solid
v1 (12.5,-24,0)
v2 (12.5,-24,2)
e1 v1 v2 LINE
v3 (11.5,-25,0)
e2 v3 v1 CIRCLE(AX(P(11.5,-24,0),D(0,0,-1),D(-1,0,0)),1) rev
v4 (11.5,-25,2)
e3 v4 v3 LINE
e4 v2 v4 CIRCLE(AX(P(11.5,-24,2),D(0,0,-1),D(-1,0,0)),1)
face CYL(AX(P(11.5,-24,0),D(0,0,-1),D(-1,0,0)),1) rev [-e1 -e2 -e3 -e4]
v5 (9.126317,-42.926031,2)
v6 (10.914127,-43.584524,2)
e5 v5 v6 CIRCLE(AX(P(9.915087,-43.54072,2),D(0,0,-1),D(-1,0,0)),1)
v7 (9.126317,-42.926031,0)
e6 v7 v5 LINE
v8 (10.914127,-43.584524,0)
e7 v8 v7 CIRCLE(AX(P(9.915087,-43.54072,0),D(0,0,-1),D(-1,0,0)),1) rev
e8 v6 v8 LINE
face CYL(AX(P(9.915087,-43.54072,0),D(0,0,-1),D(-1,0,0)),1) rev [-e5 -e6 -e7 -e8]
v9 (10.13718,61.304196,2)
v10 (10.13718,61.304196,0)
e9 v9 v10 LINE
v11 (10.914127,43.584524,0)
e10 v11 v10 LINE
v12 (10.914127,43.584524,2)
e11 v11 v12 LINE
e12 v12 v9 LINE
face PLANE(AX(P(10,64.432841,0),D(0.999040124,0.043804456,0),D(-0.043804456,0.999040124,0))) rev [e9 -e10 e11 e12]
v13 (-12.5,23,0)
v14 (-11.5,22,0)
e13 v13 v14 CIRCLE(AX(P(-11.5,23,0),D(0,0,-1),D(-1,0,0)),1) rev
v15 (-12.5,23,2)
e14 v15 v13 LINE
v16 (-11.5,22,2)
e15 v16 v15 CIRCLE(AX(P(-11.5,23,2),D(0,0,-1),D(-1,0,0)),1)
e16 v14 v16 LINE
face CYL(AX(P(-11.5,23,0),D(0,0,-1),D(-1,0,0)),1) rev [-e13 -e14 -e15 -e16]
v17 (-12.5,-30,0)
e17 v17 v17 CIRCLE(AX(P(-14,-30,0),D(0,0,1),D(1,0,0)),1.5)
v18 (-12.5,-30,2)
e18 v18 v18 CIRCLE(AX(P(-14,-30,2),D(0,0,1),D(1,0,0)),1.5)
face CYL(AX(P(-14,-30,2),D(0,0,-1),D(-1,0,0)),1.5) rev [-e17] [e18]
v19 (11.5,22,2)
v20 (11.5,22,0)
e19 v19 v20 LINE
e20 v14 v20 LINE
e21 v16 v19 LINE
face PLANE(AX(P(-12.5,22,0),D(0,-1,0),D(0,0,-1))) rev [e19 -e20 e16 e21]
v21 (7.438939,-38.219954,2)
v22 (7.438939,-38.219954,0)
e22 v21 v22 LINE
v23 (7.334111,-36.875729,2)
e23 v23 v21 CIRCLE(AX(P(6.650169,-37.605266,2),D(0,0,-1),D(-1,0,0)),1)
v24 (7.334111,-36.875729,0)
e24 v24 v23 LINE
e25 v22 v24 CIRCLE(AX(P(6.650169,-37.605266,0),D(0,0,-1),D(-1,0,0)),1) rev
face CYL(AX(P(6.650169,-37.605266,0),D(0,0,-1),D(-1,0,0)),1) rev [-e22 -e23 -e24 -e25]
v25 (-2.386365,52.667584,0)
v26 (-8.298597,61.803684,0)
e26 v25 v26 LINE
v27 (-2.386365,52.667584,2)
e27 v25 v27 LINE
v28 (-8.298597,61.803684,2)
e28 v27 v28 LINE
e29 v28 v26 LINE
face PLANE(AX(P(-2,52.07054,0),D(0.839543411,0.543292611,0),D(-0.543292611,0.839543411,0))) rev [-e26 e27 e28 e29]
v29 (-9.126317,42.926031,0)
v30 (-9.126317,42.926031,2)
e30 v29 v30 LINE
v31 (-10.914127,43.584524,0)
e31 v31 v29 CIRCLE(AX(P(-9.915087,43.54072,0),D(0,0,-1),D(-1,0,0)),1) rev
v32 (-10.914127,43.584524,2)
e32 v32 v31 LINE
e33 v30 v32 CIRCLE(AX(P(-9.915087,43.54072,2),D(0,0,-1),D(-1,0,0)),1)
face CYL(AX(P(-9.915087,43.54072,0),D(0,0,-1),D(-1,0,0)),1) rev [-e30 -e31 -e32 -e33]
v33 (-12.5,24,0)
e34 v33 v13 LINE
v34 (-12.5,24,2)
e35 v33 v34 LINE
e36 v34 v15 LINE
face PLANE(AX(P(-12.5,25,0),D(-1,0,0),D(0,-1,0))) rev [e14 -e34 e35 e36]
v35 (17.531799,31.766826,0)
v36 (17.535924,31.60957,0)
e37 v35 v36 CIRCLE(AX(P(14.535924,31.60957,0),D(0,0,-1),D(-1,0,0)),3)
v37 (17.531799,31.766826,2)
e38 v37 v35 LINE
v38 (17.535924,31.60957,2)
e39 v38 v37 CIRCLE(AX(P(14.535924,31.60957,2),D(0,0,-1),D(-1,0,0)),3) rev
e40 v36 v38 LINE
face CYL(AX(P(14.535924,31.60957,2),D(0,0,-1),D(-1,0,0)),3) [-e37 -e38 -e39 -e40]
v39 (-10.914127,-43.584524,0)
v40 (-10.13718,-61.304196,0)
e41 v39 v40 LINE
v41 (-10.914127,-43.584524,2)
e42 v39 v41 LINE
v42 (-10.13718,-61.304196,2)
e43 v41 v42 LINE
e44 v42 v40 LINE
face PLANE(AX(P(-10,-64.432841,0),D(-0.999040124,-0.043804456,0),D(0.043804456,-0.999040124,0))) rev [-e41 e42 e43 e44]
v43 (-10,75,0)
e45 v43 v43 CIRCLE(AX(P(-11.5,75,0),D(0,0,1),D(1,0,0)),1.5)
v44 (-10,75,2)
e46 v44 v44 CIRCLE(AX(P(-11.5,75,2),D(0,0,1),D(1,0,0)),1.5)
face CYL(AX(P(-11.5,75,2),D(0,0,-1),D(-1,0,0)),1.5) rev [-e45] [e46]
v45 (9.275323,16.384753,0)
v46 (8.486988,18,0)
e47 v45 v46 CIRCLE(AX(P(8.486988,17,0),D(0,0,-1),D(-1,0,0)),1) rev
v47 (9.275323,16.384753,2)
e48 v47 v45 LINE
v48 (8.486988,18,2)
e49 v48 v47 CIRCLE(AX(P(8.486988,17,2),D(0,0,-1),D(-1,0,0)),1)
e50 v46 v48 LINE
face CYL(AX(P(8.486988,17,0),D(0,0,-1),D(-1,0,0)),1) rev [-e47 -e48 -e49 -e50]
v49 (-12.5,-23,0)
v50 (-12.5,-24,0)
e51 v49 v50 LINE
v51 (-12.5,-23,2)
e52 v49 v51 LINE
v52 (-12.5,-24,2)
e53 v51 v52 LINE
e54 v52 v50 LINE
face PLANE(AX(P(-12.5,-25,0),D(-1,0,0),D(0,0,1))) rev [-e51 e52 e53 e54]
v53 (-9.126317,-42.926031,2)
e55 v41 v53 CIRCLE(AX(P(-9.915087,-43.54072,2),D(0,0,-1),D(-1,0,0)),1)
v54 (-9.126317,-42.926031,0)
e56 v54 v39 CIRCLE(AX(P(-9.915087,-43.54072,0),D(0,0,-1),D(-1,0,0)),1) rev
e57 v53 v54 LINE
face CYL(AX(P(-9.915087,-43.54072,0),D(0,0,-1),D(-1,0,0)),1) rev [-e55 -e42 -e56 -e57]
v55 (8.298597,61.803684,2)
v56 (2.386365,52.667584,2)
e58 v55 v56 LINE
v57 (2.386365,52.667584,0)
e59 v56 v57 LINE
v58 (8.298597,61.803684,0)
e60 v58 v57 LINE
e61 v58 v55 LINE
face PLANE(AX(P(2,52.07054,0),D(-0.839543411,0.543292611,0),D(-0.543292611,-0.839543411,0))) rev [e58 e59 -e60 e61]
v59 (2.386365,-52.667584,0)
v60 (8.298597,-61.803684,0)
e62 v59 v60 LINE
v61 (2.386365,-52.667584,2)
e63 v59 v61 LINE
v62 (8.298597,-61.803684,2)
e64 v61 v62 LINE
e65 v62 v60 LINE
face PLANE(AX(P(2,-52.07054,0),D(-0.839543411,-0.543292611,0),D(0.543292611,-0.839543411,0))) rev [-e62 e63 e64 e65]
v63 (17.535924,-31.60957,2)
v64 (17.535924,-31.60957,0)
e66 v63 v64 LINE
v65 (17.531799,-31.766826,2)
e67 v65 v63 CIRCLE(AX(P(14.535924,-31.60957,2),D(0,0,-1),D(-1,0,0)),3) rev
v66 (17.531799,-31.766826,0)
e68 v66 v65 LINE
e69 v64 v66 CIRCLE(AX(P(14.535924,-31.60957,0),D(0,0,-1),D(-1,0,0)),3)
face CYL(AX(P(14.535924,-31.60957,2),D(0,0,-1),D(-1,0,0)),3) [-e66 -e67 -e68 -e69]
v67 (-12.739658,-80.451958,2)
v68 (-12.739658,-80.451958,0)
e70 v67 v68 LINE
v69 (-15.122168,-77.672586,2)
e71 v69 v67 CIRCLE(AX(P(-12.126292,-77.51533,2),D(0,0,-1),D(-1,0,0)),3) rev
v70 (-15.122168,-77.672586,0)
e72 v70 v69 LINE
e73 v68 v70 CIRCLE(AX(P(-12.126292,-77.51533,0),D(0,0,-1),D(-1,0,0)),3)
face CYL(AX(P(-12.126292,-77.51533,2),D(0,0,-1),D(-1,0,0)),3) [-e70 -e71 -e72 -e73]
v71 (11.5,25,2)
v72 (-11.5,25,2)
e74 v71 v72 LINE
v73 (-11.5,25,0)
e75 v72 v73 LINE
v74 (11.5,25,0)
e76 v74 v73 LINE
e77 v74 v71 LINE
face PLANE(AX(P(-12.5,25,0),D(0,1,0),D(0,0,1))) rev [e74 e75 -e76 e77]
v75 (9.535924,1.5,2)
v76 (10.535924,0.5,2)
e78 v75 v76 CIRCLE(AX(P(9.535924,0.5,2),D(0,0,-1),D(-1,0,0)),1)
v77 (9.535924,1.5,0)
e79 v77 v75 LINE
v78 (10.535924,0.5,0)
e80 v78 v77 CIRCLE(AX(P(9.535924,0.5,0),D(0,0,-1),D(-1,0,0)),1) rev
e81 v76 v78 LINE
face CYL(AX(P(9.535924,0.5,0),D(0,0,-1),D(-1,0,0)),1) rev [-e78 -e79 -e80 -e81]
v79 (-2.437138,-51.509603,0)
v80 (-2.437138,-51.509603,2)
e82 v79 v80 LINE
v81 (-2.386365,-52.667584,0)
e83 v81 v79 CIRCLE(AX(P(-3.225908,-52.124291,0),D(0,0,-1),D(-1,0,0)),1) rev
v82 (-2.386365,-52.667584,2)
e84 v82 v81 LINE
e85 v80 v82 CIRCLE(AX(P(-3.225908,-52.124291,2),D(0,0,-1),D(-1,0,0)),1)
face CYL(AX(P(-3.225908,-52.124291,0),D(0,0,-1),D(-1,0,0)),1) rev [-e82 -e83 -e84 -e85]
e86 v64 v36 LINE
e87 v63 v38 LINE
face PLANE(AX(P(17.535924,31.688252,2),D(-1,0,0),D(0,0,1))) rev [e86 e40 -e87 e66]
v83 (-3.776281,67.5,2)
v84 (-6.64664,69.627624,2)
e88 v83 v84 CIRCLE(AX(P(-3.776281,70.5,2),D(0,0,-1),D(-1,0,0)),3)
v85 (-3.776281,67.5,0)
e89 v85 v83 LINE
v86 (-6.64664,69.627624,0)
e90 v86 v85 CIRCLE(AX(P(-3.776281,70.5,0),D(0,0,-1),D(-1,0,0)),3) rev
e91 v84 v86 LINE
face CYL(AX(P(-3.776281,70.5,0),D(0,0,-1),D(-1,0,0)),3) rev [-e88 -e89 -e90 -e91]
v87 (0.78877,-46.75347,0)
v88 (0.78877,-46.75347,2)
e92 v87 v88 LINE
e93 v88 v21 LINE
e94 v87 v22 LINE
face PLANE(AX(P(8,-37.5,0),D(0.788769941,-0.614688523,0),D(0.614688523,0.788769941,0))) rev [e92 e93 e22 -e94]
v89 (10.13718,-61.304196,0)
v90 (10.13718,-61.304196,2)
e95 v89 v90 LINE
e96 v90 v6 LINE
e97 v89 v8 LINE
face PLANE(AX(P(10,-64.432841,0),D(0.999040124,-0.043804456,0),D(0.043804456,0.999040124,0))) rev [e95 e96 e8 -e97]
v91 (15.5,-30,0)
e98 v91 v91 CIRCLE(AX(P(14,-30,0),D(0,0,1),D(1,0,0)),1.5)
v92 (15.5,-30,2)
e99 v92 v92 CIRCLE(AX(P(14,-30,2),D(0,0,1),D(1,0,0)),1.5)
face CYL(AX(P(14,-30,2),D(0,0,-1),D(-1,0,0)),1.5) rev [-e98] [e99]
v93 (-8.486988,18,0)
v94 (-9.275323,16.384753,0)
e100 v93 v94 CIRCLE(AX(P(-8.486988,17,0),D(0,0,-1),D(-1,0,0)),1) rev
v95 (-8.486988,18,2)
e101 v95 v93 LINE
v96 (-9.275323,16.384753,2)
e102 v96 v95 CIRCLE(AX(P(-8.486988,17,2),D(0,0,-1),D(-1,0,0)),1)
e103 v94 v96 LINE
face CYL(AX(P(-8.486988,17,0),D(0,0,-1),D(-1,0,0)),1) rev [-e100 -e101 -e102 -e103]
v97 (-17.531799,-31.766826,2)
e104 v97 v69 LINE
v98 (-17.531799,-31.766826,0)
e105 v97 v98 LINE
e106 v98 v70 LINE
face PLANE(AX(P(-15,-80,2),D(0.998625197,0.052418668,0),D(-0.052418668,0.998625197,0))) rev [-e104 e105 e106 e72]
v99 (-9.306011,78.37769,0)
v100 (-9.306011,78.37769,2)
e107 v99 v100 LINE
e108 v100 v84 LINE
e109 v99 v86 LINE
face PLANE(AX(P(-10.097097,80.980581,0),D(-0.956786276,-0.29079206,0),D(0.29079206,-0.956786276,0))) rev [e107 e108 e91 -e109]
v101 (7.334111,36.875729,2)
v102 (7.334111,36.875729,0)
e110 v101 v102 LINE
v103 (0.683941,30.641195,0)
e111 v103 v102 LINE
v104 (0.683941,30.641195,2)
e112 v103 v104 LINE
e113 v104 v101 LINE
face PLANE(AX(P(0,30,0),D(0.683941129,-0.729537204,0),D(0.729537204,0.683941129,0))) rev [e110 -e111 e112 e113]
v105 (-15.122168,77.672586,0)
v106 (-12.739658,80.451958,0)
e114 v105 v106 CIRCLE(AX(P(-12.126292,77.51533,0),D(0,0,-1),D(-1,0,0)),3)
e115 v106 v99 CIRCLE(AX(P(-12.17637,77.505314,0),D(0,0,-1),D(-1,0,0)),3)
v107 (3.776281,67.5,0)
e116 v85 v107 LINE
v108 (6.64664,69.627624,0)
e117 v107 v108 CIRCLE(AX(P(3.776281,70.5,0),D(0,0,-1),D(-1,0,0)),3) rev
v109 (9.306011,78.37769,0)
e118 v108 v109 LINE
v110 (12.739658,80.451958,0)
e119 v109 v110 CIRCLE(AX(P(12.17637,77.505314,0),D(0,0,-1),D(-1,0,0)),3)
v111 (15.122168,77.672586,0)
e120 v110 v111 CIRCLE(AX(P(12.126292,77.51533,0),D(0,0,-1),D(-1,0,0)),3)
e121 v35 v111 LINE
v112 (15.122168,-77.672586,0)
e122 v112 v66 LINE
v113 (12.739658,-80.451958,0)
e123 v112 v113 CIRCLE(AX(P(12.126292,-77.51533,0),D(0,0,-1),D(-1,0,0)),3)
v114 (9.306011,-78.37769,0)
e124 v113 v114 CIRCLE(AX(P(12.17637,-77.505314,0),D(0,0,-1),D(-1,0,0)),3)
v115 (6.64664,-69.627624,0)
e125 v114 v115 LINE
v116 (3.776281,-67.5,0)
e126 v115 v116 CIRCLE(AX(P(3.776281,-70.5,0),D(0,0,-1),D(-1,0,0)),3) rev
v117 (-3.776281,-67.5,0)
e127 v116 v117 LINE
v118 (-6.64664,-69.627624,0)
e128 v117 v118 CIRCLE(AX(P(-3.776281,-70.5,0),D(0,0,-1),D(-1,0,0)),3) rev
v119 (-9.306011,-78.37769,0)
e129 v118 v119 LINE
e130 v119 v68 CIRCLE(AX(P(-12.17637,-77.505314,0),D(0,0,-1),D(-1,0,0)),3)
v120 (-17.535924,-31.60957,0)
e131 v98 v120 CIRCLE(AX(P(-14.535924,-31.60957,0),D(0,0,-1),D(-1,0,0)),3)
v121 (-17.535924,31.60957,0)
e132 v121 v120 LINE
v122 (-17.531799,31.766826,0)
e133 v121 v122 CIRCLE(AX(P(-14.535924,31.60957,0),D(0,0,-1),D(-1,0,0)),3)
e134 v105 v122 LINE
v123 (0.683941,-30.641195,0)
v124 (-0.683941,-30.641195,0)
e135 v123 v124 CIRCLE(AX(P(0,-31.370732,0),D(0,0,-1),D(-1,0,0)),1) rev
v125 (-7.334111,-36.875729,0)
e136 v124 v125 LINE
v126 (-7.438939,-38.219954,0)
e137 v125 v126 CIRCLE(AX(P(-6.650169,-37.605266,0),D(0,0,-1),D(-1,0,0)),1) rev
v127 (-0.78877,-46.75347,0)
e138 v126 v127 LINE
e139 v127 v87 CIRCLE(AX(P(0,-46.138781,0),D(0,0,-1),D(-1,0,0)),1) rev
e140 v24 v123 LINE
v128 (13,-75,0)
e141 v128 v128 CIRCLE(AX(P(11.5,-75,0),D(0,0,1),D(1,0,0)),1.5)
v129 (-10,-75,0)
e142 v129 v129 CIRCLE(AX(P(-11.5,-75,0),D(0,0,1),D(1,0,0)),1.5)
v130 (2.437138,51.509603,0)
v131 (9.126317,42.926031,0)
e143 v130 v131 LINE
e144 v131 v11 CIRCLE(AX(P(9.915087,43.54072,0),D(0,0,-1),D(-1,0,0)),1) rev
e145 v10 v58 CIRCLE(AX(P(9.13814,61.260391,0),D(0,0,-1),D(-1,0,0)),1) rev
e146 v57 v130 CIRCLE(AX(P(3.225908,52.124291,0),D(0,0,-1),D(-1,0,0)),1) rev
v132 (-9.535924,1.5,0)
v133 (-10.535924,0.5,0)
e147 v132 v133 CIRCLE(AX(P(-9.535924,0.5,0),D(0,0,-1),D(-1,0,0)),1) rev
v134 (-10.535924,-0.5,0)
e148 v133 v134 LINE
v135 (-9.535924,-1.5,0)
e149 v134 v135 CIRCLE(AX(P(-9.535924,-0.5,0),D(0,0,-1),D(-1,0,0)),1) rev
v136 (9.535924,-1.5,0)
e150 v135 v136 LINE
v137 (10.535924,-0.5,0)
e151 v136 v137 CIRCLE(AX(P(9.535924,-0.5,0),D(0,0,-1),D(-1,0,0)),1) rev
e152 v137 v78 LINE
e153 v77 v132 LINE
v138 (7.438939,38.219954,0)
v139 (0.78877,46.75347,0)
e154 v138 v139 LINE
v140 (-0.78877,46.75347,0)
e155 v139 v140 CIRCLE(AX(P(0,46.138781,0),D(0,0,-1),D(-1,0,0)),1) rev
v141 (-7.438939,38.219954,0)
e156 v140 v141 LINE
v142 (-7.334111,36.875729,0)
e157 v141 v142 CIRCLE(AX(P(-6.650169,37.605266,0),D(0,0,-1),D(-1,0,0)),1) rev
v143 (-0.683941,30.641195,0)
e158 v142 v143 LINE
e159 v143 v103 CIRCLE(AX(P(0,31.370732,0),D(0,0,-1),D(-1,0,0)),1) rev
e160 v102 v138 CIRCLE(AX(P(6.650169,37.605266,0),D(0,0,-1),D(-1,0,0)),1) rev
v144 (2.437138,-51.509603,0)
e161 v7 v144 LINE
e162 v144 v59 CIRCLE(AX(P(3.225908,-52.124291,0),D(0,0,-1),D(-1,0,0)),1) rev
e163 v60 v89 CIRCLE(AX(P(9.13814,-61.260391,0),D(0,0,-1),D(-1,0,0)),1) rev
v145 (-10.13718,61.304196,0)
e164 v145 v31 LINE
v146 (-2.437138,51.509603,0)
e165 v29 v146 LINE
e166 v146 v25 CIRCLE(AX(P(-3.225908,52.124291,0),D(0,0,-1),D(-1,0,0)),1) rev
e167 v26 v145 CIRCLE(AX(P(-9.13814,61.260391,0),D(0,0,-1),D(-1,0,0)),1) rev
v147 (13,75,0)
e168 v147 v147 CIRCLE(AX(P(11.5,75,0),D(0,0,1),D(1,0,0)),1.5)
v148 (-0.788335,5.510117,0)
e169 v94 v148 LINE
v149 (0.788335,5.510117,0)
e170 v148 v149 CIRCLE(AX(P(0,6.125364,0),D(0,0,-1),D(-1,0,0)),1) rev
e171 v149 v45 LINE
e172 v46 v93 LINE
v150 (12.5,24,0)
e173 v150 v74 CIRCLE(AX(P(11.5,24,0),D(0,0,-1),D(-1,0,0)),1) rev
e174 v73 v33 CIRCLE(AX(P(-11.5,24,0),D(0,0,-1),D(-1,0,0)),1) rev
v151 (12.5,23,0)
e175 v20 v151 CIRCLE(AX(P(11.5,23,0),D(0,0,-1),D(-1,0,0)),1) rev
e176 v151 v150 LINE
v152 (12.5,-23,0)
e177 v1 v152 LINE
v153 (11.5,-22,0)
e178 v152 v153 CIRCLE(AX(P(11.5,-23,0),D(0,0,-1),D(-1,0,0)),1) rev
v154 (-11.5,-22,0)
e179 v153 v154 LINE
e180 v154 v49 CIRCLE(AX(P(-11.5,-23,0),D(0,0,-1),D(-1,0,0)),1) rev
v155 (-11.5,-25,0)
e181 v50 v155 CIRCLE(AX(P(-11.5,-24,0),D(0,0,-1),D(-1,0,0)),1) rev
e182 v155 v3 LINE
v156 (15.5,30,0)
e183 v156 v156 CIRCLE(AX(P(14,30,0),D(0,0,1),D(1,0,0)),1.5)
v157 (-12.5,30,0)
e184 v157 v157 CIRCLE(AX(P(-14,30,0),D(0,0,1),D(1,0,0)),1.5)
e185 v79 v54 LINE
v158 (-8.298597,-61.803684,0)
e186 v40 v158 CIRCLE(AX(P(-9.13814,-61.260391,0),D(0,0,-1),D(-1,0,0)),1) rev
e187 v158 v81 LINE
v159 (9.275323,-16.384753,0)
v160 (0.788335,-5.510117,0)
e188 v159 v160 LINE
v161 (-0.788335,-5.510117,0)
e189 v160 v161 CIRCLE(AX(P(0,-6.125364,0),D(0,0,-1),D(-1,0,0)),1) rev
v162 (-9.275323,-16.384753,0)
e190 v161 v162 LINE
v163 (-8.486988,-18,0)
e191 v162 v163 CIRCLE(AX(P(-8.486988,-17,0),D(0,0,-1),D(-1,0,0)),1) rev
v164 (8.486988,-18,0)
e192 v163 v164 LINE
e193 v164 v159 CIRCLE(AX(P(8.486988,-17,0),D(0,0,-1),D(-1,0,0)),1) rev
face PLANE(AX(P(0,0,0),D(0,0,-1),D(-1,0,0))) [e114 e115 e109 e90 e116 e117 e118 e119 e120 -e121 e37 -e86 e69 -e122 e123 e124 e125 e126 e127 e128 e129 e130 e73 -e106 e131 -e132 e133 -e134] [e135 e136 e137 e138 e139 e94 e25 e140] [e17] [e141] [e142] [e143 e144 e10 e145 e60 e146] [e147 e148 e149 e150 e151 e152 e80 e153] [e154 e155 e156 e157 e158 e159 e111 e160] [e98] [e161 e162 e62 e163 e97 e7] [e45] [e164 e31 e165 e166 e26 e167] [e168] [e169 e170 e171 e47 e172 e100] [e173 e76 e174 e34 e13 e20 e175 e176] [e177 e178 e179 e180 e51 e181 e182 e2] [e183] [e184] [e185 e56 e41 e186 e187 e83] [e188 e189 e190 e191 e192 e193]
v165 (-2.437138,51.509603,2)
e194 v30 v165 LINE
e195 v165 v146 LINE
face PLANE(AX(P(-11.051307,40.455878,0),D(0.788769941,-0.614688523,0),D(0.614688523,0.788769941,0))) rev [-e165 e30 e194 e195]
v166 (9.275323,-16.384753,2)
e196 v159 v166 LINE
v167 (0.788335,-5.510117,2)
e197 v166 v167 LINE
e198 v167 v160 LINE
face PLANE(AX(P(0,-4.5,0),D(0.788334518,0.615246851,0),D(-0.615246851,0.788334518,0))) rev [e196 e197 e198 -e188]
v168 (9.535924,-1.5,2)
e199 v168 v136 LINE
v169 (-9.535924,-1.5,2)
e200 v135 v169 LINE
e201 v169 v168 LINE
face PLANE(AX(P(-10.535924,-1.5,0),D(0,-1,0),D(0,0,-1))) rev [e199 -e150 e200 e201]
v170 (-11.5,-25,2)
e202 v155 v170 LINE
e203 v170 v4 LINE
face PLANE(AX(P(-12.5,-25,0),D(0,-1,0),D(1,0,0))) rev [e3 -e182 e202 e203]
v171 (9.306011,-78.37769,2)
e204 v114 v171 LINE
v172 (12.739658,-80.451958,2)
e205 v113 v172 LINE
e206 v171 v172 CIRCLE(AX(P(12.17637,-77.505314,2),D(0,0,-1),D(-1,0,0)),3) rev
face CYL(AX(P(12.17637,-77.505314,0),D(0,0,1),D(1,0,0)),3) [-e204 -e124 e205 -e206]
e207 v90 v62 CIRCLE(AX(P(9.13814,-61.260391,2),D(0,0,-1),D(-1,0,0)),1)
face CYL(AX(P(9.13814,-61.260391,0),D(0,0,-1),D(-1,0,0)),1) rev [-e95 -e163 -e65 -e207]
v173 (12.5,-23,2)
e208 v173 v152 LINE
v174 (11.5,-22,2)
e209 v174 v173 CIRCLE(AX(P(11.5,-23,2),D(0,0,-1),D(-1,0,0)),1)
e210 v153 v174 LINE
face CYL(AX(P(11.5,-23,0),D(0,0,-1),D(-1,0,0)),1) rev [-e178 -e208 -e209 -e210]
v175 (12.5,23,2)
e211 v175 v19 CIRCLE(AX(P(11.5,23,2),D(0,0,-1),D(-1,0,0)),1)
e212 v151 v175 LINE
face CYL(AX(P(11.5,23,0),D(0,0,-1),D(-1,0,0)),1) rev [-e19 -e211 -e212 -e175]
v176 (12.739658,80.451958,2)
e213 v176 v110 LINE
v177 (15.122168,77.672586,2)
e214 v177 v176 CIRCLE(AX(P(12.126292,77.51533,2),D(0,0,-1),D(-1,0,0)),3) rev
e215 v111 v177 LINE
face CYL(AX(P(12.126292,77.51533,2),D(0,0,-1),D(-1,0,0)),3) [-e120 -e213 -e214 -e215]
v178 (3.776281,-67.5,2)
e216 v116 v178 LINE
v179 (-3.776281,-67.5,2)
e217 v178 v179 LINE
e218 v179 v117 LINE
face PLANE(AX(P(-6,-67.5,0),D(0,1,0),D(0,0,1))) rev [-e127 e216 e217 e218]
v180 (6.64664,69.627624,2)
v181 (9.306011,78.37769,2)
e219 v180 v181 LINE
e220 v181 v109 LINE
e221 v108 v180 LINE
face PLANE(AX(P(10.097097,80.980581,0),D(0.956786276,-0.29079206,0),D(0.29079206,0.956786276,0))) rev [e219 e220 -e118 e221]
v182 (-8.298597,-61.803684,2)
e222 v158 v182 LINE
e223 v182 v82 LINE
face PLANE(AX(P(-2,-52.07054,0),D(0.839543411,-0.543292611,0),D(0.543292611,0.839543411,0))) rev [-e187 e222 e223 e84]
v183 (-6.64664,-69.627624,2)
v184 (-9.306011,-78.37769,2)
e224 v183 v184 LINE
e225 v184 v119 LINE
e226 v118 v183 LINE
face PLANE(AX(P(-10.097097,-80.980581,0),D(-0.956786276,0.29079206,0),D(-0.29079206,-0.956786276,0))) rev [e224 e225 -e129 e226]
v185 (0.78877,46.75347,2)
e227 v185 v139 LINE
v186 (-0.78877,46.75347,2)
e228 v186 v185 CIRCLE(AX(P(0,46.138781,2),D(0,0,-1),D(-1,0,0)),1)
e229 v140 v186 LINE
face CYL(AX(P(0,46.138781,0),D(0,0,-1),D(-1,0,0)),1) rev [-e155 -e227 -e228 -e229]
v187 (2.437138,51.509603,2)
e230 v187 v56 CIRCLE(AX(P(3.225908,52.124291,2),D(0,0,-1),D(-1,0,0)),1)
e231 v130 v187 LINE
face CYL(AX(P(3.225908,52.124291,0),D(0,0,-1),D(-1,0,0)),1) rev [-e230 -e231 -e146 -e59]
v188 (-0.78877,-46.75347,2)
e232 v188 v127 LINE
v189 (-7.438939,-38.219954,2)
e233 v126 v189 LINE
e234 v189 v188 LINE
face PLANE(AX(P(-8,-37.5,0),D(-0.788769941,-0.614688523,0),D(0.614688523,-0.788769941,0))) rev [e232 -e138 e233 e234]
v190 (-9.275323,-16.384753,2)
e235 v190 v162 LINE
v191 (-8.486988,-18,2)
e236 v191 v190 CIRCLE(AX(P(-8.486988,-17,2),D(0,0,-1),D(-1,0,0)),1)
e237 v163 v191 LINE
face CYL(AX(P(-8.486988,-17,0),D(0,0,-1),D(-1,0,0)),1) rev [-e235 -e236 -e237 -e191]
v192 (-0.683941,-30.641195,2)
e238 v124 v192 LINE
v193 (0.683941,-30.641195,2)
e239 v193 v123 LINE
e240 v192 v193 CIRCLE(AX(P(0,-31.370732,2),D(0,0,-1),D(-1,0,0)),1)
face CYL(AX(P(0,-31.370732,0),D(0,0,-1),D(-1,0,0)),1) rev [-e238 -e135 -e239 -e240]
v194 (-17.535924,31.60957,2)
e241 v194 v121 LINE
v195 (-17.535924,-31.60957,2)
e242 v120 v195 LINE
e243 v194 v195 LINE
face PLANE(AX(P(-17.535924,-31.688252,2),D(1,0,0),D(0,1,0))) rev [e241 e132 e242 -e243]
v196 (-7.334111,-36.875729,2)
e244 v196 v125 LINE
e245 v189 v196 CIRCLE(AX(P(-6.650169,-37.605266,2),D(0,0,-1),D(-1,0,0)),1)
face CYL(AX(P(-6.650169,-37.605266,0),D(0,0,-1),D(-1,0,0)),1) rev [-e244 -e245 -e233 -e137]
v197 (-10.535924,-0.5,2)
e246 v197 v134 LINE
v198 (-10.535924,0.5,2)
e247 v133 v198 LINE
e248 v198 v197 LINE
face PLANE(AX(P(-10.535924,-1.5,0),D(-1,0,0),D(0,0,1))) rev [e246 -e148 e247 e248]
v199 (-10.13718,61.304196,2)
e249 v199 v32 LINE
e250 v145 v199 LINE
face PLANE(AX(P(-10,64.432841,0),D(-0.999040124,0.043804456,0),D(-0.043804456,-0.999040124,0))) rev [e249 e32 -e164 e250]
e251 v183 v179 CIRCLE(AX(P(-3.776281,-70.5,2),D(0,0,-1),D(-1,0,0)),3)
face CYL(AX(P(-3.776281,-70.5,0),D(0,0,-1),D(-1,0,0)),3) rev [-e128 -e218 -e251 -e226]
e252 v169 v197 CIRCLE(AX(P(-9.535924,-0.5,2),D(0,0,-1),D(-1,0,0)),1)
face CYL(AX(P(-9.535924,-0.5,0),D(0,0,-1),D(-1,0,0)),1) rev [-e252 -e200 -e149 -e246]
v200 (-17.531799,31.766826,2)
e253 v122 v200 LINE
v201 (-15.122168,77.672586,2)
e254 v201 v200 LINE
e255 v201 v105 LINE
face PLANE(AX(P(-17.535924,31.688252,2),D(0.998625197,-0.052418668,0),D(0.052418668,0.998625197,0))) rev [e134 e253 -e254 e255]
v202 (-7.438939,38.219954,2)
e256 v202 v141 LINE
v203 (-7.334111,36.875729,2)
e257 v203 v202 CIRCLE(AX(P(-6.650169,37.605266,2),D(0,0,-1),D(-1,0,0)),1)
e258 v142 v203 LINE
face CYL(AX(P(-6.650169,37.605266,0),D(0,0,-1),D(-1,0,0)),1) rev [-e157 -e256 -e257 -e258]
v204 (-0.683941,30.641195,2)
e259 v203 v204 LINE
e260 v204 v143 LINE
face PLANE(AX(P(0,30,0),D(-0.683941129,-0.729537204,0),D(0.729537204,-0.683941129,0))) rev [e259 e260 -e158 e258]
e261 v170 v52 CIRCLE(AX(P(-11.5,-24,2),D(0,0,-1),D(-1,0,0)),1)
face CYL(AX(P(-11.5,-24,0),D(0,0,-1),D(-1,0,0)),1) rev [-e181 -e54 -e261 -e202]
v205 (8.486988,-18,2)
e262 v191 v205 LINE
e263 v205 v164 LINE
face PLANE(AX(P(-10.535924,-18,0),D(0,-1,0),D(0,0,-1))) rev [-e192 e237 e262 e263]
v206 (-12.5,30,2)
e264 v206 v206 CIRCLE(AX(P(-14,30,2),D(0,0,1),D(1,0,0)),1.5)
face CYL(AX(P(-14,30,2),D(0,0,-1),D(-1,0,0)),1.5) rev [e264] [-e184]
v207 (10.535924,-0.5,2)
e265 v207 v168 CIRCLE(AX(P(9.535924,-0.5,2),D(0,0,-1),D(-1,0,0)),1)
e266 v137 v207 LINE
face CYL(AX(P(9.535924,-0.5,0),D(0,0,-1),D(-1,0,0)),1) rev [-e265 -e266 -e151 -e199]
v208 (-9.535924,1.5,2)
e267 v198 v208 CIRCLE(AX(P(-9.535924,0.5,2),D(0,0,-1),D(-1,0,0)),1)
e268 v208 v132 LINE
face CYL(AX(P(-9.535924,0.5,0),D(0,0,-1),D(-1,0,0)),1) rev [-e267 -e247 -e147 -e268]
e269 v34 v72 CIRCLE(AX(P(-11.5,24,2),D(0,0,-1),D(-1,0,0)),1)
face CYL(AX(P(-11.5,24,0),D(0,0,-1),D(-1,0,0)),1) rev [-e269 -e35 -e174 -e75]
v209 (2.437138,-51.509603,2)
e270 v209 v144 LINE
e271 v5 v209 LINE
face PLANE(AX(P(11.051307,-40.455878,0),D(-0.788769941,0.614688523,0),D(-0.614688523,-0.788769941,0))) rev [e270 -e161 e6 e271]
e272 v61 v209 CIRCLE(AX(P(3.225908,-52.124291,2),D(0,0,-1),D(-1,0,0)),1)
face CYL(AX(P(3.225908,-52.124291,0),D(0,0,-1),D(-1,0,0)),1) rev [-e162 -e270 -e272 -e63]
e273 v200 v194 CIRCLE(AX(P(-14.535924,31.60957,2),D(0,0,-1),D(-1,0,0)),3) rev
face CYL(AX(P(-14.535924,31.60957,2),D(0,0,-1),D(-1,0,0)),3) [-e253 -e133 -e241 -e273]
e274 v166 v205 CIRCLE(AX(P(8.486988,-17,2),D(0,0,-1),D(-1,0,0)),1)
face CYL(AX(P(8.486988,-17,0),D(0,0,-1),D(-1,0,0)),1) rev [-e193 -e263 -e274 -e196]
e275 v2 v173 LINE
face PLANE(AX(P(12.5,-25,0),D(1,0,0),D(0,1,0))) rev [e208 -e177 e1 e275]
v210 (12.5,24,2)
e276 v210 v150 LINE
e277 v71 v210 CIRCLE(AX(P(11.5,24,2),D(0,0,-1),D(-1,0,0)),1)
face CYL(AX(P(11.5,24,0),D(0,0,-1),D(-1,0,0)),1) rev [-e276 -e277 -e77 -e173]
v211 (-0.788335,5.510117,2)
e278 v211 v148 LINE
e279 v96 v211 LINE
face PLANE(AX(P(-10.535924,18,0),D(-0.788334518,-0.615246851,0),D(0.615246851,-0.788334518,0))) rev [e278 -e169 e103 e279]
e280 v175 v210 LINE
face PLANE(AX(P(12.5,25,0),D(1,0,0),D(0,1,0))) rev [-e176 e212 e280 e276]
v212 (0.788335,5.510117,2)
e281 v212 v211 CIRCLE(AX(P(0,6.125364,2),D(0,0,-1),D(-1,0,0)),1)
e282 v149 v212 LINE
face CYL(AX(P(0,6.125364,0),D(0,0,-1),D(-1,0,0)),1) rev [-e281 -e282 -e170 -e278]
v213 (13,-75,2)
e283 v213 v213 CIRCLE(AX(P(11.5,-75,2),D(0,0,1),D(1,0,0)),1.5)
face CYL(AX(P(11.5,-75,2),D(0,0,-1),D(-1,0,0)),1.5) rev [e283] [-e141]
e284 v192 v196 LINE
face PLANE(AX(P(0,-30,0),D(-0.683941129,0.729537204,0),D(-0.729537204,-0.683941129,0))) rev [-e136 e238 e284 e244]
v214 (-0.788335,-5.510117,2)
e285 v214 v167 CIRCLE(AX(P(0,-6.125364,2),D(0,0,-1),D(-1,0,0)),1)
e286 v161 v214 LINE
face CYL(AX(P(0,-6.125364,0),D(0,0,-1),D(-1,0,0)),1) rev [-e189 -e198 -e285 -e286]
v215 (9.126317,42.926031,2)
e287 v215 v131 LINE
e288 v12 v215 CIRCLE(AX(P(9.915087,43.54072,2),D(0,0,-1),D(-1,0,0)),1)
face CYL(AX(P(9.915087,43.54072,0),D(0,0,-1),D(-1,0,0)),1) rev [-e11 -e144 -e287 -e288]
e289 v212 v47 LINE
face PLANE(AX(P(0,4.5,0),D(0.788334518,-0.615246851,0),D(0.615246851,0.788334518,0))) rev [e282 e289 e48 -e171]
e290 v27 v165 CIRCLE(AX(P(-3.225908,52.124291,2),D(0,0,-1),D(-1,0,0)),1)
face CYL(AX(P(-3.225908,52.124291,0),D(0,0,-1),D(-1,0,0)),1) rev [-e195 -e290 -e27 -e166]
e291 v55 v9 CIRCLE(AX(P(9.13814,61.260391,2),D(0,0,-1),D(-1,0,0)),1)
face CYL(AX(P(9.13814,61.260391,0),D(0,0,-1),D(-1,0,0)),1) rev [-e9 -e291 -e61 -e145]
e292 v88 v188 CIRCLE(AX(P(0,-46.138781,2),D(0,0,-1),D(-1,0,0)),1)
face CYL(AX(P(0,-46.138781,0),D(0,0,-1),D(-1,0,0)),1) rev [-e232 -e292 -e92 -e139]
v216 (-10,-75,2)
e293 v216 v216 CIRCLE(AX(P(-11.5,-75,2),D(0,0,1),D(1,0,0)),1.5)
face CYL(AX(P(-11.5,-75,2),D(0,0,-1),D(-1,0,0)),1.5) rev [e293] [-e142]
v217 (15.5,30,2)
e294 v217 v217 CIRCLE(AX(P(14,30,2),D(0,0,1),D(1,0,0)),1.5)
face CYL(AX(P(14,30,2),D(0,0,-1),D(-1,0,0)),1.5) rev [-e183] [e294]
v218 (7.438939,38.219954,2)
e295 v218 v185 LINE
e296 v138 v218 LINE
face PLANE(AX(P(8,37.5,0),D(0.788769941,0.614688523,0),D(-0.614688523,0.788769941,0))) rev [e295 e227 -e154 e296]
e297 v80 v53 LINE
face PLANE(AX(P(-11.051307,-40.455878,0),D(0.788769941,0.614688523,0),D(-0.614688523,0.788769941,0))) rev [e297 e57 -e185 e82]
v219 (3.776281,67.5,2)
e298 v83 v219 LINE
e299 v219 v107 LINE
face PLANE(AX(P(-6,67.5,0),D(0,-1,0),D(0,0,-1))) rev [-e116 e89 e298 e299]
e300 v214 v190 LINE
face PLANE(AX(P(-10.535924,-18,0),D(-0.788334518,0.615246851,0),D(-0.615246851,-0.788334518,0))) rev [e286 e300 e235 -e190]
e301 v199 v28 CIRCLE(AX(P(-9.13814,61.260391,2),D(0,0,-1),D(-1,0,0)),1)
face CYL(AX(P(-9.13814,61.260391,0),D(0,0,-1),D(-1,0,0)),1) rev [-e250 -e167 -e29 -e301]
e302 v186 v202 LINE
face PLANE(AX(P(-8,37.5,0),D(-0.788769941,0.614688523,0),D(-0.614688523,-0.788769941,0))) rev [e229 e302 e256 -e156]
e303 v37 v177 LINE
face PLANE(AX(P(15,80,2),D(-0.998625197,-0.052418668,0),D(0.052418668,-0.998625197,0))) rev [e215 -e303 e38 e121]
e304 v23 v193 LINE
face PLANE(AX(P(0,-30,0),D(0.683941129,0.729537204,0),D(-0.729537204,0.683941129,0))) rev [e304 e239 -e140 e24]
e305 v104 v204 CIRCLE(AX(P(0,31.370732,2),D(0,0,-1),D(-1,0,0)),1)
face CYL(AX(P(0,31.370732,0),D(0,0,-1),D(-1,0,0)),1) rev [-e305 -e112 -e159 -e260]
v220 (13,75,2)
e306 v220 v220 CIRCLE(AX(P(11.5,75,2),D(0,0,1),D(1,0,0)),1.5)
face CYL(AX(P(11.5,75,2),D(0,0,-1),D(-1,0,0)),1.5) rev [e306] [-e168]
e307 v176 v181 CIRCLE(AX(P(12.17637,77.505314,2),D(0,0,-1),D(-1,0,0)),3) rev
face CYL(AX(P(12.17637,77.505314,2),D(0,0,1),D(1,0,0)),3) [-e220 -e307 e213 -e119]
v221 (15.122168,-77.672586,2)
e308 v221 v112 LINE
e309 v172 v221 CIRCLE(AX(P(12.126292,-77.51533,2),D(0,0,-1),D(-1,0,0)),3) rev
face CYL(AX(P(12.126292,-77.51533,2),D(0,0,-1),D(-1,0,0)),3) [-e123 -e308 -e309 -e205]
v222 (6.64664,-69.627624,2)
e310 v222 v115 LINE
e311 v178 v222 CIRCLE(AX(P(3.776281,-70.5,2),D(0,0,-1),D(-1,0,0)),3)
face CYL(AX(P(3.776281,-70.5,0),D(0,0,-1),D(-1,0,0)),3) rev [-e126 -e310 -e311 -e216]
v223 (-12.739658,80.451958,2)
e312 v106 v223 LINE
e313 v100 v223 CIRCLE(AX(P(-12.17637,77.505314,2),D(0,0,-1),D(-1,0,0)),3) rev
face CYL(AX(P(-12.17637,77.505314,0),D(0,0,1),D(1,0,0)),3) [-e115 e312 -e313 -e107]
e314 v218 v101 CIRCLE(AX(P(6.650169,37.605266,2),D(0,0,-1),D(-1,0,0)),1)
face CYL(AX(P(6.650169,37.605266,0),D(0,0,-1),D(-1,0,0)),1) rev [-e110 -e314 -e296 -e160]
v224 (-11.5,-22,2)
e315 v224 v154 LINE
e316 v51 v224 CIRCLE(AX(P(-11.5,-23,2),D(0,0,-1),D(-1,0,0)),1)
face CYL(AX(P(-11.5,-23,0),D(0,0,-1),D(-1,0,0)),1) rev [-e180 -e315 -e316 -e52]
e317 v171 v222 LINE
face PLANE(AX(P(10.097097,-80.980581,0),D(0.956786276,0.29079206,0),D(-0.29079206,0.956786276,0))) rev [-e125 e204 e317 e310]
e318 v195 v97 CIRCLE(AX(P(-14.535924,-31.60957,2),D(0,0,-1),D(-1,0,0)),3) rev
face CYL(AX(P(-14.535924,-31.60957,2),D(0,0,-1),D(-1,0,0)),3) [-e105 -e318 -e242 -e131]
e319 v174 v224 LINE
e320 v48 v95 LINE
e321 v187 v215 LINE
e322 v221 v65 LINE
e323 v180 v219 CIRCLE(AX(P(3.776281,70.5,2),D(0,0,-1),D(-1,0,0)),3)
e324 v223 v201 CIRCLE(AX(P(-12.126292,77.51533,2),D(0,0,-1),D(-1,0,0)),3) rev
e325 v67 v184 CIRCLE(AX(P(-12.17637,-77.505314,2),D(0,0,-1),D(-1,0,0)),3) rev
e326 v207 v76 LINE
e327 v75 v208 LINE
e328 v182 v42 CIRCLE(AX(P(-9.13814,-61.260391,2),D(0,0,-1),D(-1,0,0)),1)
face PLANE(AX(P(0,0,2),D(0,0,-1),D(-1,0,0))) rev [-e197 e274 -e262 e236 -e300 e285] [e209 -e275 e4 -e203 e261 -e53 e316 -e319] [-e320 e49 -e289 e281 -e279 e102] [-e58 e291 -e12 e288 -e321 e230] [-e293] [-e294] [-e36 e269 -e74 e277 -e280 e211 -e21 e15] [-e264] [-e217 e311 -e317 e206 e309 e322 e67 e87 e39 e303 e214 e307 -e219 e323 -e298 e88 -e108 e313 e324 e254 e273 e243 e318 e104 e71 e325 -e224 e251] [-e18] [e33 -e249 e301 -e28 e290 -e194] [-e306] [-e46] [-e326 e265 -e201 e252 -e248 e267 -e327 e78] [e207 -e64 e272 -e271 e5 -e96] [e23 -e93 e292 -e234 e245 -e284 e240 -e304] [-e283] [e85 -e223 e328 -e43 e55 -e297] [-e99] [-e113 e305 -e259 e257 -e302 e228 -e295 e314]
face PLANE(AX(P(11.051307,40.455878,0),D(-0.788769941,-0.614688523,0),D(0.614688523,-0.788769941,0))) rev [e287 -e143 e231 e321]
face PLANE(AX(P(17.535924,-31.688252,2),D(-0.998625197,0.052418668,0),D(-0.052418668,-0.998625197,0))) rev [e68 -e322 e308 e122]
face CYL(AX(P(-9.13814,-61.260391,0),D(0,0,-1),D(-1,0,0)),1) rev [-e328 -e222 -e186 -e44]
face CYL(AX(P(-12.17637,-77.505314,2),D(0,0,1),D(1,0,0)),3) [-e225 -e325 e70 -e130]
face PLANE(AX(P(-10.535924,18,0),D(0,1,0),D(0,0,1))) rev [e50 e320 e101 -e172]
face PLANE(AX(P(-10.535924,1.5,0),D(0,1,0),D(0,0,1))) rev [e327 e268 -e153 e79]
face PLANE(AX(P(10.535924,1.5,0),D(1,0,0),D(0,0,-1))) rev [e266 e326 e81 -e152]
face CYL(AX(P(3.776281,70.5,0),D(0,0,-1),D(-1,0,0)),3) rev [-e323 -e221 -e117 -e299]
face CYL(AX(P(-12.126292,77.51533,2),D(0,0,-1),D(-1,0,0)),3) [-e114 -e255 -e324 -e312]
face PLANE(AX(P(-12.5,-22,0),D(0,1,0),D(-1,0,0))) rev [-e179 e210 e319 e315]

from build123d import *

# Parameters (mm, degrees)
CROQUIS1_R              = 1.5
SALIENTE_EXTRUIR1_DEPTH = 2
CROQUIS2_W              = 25
CROQUIS2_H              = 3
CROQUIS2_W_2            = 21.071847778
CORTAR_EXTRUIR1_DEPTH   = 2
REDONDEO2_R             = 1
REDONDEO1_R             = 3


with BuildPart() as part:
    # Croquis1 → Saliente-Extruir1 (new body)
    with BuildSketch(Plane.XY):
        Polygon((-17.535923889, 31.688251973), (-15, 80), (0, 83), (15, 80), (17.535923889, 31.688251973), (17.535923889, -31.688251973), (15, -80), (0, -83), (-15, -80), (-17.535923889, -31.688251973), align=None)
        with Locations((-11.5, 75)):
            Circle(CROQUIS1_R, mode=Mode.SUBTRACT)
        with Locations((11.5, 75)):
            Circle(CROQUIS1_R, mode=Mode.SUBTRACT)
        with Locations((14, 30)):
            Circle(CROQUIS1_R, mode=Mode.SUBTRACT)
        with Locations((-14, 30)):
            Circle(CROQUIS1_R, mode=Mode.SUBTRACT)
        with Locations((-14, -30)):
            Circle(CROQUIS1_R, mode=Mode.SUBTRACT)
        with Locations((14, -30)):
            Circle(CROQUIS1_R, mode=Mode.SUBTRACT)
        with Locations((-11.5, -75)):
            Circle(CROQUIS1_R, mode=Mode.SUBTRACT)
        with Locations((11.5, -75)):
            Circle(CROQUIS1_R, mode=Mode.SUBTRACT)
    extrude(amount=SALIENTE_EXTRUIR1_DEPTH)

    # Croquis2 → Cortar-Extruir1 (cut)
    with BuildSketch(Plane.XY.offset(2)):
        Polygon((-10.097096622, 80.980580676), (-6, 67.5), (6, 67.5), (10.097096622, 80.980580676), (0, 83), align=None)
        Polygon((-10, 64.432841453), (-11.051306944, 40.455878474), (-2, 52.07053953), align=None)
        Polygon((2, 52.07053953), (10, 64.432841453), (11.051306944, 40.455878474), align=None)
        Polygon((0, 30), (-8, 37.5), (0, 47.7656212), (8, 37.5), align=None)
        Polygon((-10.535923889, 18), (10.535923889, 18), (0, 4.5), align=None)
        with Locations((0, 23.5)):
            Rectangle(CROQUIS2_W, CROQUIS2_H)
        Rectangle(CROQUIS2_W_2, CROQUIS2_H)
        Polygon((0, -4.5), (10.535923889, -18), (-10.535923889, -18), align=None)
        with Locations((0, -23.5)):
            Rectangle(CROQUIS2_W, CROQUIS2_H)
        Polygon((8, -37.5), (0, -47.7656212), (-8, -37.5), (0, -30), align=None)
        Polygon((11.051306944, -40.455878474), (2, -52.07053953), (10, -64.432841453), align=None)
        Polygon((-2, -52.07053953), (-10, -64.432841453), (-11.051306944, -40.455878474), align=None)
        Polygon((10.097096622, -80.980580676), (0, -83), (-10.097096622, -80.980580676), (-6, -67.5), (6, -67.5), align=None)
    extrude(amount=-CORTAR_EXTRUIR1_DEPTH, mode=Mode.SUBTRACT)

    # Redondeo2
    redondeo2_edges = [part.edges().sort_by_distance(p)[0] for p in [
        (-12.5, 22, 1),
        (-12.5, 25, 1),
        (12.5, 25, 1),
        (12.5, 22, 1),
        (11.051306944, 40.455878474, 1),
        (2, 52.07053953, 1),
        (10, 64.432841453, 1),
        (-10, 64.432841453, 1),
        (-2, 52.07053953, 1),
        (-11.051306944, 40.455878474, 1),
        (0, 47.7656212, 1),
        (8, 37.5, 1),
        (0, 30, 1),
        (-8, 37.5, 1),
        (-10.535923889, -18, 1),
        (0, -4.5, 1),
        (10.535923889, -18, 1),
        (-10.535923889, 1.5, 1),
        (10.535923889, 1.5, 1),
        (10.535923889, -1.5, 1),
        (-10.535923889, -1.5, 1),
        (12.5, -25, 1),
        (-12.5, -25, 1),
        (-12.5, -22, 1),
        (12.5, -22, 1),
        (0, 4.5, 1),
        (-10.535923889, 18, 1),
        (10.535923889, 18, 1),
        (11.051306944, -40.455878474, 1),
        (10, -64.432841453, 1),
        (2, -52.07053953, 1),
        (-8, -37.5, 1),
        (0, -30, 1),
        (8, -37.5, 1),
        (0, -47.7656212, 1),
        (-11.051306944, -40.455878474, 1),
        (-2, -52.07053953, 1),
        (-10, -64.432841453, 1),
    ]]
    fillet(redondeo2_edges, radius=REDONDEO2_R)

    # Redondeo1
    # the kernel refuses this fillet: 3 mm, written as the material it adds along each edge
    with BuildSketch(Plane(origin=(-6, -67.5, 2), x_dir=(-0.29079205959554133, -0.956786276070149, 0), z_dir=(0, 0, -1)), Plane(origin=(6, -67.5, 2), x_dir=(-1, 0, 0), z_dir=(0, 0, -1)), Plane(origin=(6, 67.5, 2), x_dir=(0.2907920595955413, 0.9567862760701489, 0), z_dir=(0, 0, -1)), Plane(origin=(-6, 67.5, 2), x_dir=(1, 0, 0), z_dir=(0, 0, -1))) as redondeo1_piece_1:
        with BuildLine():
            CenterArc((REDONDEO1_R * 0.741239666728, -REDONDEO1_R), REDONDEO1_R, 90, 73.09461858)
            Line((-REDONDEO1_R * 0.215546609342, -REDONDEO1_R * 0.709207940404), (0, 0))
            Line((0, 0), (REDONDEO1_R * 0.741239666728, 0))
        make_face()
    extrude(amount=2)
    # the kernel refuses this fillet: 3 mm, written as the material it takes off along each edge
    with BuildSketch(Plane(origin=(15, -80, -5.826545773), x_dir=(-0.9805806756909198, -0.1961161351381855, 0), z_dir=(0, 0, 1)), Plane(origin=(-15, -80, -5.826545773), x_dir=(-0.05241866824073038, 0.9986251965676953, 0), z_dir=(0, 0, 1)), Plane(origin=(15, 80, -5.826545773), x_dir=(0.052418668240731464, -0.9986251965676953, 0), z_dir=(0, 0, 1)), Plane(origin=(-15, 80, -5.826545773), x_dir=(0.9805806756909198, 0.19611613513818563, 0), z_dir=(0, 0, 1))) as redondeo1_2_piece_1:
        with BuildLine():
            CenterArc((REDONDEO1_R * 0.776872769711, -REDONDEO1_R), REDONDEO1_R, 90, 75.685321964)
            Line((-REDONDEO1_R * 0.192079653677, -REDONDEO1_R * 0.752752752875), (0, 0))
            Line((0, 0), (REDONDEO1_R * 0.776872769711, 0))
        make_face()
    extrude(amount=13.653091546, mode=Mode.SUBTRACT)
    with BuildSketch(Plane(origin=(10.097096622, -80.980580676, 8.801127509), x_dir=(-0.29079205959554183, 0.9567862760701488, 0), z_dir=(0, 0, -1)), Plane(origin=(-10.097096622, -80.980580676, 8.801127509), x_dir=(-0.98058067569092, 0.1961161351381849, 0), z_dir=(0, 0, -1)), Plane(origin=(10.097096622, 80.980580676, 8.801127509), x_dir=(0.98058067569092, -0.1961161351381849, 0), z_dir=(0, 0, -1)), Plane(origin=(-10.097096622, 80.980580676, 8.801127509), x_dir=(0.29079205959554244, -0.9567862760701485, 0), z_dir=(0, 0, -1))) as redondeo1_2_piece_2:
        with BuildLine():
            CenterArc((REDONDEO1_R * 0.906817001191, REDONDEO1_R), REDONDEO1_R, 185.595448946, 84.404551054)
            Line((-REDONDEO1_R * 0.0884181467465, REDONDEO1_R * 0.902496152332), (0, 0))
            Line((0, 0), (REDONDEO1_R * 0.906817001191, 0))
        make_face()
    extrude(amount=15.602255018, mode=Mode.SUBTRACT)
    with BuildSketch(Plane(origin=(17.535923889, -31.688251973, -0.196705221), x_dir=(-0.052418668240729306, -0.9986251965676954, 0), z_dir=(0, 0, 1)), Plane(origin=(17.535923889, 31.688251973, -0.196705221), x_dir=(0, -1, 0), z_dir=(0, 0, 1)), Plane(origin=(-17.535923889, -31.688251973, -0.196705221), x_dir=(0, 1, 0), z_dir=(0, 0, 1))) as redondeo1_2_piece_3:
        with BuildLine():
            CenterArc((REDONDEO1_R * 0.0262273628546, -REDONDEO1_R), REDONDEO1_R, 90, 3.004745562)
            Line((-REDONDEO1_R * 0.0261913053861, -REDONDEO1_R * 0.0013748034323), (0, 0))
            Line((0, 0), (REDONDEO1_R * 0.0262273628546, 0))
        make_face()
    extrude(amount=2.393410443, mode=Mode.SUBTRACT)
    with BuildSketch(Plane(origin=(-17.535923889, 31.688251973, -0.196705221), x_dir=(0, -1, 0), z_dir=(0, 0, 1))) as redondeo1_2_piece_4:
        with BuildLine():
            CenterArc((REDONDEO1_R * 0.0262273628546, REDONDEO1_R), REDONDEO1_R, 266.995254438, 3.004745562)
            Line((-REDONDEO1_R * 0.0261913053861, REDONDEO1_R * 0.0013748034323), (0, 0))
            Line((0, 0), (REDONDEO1_R * 0.0262273628546, 0))
        make_face()
    extrude(amount=2.393410443, mode=Mode.SUBTRACT)


solid = part.part
